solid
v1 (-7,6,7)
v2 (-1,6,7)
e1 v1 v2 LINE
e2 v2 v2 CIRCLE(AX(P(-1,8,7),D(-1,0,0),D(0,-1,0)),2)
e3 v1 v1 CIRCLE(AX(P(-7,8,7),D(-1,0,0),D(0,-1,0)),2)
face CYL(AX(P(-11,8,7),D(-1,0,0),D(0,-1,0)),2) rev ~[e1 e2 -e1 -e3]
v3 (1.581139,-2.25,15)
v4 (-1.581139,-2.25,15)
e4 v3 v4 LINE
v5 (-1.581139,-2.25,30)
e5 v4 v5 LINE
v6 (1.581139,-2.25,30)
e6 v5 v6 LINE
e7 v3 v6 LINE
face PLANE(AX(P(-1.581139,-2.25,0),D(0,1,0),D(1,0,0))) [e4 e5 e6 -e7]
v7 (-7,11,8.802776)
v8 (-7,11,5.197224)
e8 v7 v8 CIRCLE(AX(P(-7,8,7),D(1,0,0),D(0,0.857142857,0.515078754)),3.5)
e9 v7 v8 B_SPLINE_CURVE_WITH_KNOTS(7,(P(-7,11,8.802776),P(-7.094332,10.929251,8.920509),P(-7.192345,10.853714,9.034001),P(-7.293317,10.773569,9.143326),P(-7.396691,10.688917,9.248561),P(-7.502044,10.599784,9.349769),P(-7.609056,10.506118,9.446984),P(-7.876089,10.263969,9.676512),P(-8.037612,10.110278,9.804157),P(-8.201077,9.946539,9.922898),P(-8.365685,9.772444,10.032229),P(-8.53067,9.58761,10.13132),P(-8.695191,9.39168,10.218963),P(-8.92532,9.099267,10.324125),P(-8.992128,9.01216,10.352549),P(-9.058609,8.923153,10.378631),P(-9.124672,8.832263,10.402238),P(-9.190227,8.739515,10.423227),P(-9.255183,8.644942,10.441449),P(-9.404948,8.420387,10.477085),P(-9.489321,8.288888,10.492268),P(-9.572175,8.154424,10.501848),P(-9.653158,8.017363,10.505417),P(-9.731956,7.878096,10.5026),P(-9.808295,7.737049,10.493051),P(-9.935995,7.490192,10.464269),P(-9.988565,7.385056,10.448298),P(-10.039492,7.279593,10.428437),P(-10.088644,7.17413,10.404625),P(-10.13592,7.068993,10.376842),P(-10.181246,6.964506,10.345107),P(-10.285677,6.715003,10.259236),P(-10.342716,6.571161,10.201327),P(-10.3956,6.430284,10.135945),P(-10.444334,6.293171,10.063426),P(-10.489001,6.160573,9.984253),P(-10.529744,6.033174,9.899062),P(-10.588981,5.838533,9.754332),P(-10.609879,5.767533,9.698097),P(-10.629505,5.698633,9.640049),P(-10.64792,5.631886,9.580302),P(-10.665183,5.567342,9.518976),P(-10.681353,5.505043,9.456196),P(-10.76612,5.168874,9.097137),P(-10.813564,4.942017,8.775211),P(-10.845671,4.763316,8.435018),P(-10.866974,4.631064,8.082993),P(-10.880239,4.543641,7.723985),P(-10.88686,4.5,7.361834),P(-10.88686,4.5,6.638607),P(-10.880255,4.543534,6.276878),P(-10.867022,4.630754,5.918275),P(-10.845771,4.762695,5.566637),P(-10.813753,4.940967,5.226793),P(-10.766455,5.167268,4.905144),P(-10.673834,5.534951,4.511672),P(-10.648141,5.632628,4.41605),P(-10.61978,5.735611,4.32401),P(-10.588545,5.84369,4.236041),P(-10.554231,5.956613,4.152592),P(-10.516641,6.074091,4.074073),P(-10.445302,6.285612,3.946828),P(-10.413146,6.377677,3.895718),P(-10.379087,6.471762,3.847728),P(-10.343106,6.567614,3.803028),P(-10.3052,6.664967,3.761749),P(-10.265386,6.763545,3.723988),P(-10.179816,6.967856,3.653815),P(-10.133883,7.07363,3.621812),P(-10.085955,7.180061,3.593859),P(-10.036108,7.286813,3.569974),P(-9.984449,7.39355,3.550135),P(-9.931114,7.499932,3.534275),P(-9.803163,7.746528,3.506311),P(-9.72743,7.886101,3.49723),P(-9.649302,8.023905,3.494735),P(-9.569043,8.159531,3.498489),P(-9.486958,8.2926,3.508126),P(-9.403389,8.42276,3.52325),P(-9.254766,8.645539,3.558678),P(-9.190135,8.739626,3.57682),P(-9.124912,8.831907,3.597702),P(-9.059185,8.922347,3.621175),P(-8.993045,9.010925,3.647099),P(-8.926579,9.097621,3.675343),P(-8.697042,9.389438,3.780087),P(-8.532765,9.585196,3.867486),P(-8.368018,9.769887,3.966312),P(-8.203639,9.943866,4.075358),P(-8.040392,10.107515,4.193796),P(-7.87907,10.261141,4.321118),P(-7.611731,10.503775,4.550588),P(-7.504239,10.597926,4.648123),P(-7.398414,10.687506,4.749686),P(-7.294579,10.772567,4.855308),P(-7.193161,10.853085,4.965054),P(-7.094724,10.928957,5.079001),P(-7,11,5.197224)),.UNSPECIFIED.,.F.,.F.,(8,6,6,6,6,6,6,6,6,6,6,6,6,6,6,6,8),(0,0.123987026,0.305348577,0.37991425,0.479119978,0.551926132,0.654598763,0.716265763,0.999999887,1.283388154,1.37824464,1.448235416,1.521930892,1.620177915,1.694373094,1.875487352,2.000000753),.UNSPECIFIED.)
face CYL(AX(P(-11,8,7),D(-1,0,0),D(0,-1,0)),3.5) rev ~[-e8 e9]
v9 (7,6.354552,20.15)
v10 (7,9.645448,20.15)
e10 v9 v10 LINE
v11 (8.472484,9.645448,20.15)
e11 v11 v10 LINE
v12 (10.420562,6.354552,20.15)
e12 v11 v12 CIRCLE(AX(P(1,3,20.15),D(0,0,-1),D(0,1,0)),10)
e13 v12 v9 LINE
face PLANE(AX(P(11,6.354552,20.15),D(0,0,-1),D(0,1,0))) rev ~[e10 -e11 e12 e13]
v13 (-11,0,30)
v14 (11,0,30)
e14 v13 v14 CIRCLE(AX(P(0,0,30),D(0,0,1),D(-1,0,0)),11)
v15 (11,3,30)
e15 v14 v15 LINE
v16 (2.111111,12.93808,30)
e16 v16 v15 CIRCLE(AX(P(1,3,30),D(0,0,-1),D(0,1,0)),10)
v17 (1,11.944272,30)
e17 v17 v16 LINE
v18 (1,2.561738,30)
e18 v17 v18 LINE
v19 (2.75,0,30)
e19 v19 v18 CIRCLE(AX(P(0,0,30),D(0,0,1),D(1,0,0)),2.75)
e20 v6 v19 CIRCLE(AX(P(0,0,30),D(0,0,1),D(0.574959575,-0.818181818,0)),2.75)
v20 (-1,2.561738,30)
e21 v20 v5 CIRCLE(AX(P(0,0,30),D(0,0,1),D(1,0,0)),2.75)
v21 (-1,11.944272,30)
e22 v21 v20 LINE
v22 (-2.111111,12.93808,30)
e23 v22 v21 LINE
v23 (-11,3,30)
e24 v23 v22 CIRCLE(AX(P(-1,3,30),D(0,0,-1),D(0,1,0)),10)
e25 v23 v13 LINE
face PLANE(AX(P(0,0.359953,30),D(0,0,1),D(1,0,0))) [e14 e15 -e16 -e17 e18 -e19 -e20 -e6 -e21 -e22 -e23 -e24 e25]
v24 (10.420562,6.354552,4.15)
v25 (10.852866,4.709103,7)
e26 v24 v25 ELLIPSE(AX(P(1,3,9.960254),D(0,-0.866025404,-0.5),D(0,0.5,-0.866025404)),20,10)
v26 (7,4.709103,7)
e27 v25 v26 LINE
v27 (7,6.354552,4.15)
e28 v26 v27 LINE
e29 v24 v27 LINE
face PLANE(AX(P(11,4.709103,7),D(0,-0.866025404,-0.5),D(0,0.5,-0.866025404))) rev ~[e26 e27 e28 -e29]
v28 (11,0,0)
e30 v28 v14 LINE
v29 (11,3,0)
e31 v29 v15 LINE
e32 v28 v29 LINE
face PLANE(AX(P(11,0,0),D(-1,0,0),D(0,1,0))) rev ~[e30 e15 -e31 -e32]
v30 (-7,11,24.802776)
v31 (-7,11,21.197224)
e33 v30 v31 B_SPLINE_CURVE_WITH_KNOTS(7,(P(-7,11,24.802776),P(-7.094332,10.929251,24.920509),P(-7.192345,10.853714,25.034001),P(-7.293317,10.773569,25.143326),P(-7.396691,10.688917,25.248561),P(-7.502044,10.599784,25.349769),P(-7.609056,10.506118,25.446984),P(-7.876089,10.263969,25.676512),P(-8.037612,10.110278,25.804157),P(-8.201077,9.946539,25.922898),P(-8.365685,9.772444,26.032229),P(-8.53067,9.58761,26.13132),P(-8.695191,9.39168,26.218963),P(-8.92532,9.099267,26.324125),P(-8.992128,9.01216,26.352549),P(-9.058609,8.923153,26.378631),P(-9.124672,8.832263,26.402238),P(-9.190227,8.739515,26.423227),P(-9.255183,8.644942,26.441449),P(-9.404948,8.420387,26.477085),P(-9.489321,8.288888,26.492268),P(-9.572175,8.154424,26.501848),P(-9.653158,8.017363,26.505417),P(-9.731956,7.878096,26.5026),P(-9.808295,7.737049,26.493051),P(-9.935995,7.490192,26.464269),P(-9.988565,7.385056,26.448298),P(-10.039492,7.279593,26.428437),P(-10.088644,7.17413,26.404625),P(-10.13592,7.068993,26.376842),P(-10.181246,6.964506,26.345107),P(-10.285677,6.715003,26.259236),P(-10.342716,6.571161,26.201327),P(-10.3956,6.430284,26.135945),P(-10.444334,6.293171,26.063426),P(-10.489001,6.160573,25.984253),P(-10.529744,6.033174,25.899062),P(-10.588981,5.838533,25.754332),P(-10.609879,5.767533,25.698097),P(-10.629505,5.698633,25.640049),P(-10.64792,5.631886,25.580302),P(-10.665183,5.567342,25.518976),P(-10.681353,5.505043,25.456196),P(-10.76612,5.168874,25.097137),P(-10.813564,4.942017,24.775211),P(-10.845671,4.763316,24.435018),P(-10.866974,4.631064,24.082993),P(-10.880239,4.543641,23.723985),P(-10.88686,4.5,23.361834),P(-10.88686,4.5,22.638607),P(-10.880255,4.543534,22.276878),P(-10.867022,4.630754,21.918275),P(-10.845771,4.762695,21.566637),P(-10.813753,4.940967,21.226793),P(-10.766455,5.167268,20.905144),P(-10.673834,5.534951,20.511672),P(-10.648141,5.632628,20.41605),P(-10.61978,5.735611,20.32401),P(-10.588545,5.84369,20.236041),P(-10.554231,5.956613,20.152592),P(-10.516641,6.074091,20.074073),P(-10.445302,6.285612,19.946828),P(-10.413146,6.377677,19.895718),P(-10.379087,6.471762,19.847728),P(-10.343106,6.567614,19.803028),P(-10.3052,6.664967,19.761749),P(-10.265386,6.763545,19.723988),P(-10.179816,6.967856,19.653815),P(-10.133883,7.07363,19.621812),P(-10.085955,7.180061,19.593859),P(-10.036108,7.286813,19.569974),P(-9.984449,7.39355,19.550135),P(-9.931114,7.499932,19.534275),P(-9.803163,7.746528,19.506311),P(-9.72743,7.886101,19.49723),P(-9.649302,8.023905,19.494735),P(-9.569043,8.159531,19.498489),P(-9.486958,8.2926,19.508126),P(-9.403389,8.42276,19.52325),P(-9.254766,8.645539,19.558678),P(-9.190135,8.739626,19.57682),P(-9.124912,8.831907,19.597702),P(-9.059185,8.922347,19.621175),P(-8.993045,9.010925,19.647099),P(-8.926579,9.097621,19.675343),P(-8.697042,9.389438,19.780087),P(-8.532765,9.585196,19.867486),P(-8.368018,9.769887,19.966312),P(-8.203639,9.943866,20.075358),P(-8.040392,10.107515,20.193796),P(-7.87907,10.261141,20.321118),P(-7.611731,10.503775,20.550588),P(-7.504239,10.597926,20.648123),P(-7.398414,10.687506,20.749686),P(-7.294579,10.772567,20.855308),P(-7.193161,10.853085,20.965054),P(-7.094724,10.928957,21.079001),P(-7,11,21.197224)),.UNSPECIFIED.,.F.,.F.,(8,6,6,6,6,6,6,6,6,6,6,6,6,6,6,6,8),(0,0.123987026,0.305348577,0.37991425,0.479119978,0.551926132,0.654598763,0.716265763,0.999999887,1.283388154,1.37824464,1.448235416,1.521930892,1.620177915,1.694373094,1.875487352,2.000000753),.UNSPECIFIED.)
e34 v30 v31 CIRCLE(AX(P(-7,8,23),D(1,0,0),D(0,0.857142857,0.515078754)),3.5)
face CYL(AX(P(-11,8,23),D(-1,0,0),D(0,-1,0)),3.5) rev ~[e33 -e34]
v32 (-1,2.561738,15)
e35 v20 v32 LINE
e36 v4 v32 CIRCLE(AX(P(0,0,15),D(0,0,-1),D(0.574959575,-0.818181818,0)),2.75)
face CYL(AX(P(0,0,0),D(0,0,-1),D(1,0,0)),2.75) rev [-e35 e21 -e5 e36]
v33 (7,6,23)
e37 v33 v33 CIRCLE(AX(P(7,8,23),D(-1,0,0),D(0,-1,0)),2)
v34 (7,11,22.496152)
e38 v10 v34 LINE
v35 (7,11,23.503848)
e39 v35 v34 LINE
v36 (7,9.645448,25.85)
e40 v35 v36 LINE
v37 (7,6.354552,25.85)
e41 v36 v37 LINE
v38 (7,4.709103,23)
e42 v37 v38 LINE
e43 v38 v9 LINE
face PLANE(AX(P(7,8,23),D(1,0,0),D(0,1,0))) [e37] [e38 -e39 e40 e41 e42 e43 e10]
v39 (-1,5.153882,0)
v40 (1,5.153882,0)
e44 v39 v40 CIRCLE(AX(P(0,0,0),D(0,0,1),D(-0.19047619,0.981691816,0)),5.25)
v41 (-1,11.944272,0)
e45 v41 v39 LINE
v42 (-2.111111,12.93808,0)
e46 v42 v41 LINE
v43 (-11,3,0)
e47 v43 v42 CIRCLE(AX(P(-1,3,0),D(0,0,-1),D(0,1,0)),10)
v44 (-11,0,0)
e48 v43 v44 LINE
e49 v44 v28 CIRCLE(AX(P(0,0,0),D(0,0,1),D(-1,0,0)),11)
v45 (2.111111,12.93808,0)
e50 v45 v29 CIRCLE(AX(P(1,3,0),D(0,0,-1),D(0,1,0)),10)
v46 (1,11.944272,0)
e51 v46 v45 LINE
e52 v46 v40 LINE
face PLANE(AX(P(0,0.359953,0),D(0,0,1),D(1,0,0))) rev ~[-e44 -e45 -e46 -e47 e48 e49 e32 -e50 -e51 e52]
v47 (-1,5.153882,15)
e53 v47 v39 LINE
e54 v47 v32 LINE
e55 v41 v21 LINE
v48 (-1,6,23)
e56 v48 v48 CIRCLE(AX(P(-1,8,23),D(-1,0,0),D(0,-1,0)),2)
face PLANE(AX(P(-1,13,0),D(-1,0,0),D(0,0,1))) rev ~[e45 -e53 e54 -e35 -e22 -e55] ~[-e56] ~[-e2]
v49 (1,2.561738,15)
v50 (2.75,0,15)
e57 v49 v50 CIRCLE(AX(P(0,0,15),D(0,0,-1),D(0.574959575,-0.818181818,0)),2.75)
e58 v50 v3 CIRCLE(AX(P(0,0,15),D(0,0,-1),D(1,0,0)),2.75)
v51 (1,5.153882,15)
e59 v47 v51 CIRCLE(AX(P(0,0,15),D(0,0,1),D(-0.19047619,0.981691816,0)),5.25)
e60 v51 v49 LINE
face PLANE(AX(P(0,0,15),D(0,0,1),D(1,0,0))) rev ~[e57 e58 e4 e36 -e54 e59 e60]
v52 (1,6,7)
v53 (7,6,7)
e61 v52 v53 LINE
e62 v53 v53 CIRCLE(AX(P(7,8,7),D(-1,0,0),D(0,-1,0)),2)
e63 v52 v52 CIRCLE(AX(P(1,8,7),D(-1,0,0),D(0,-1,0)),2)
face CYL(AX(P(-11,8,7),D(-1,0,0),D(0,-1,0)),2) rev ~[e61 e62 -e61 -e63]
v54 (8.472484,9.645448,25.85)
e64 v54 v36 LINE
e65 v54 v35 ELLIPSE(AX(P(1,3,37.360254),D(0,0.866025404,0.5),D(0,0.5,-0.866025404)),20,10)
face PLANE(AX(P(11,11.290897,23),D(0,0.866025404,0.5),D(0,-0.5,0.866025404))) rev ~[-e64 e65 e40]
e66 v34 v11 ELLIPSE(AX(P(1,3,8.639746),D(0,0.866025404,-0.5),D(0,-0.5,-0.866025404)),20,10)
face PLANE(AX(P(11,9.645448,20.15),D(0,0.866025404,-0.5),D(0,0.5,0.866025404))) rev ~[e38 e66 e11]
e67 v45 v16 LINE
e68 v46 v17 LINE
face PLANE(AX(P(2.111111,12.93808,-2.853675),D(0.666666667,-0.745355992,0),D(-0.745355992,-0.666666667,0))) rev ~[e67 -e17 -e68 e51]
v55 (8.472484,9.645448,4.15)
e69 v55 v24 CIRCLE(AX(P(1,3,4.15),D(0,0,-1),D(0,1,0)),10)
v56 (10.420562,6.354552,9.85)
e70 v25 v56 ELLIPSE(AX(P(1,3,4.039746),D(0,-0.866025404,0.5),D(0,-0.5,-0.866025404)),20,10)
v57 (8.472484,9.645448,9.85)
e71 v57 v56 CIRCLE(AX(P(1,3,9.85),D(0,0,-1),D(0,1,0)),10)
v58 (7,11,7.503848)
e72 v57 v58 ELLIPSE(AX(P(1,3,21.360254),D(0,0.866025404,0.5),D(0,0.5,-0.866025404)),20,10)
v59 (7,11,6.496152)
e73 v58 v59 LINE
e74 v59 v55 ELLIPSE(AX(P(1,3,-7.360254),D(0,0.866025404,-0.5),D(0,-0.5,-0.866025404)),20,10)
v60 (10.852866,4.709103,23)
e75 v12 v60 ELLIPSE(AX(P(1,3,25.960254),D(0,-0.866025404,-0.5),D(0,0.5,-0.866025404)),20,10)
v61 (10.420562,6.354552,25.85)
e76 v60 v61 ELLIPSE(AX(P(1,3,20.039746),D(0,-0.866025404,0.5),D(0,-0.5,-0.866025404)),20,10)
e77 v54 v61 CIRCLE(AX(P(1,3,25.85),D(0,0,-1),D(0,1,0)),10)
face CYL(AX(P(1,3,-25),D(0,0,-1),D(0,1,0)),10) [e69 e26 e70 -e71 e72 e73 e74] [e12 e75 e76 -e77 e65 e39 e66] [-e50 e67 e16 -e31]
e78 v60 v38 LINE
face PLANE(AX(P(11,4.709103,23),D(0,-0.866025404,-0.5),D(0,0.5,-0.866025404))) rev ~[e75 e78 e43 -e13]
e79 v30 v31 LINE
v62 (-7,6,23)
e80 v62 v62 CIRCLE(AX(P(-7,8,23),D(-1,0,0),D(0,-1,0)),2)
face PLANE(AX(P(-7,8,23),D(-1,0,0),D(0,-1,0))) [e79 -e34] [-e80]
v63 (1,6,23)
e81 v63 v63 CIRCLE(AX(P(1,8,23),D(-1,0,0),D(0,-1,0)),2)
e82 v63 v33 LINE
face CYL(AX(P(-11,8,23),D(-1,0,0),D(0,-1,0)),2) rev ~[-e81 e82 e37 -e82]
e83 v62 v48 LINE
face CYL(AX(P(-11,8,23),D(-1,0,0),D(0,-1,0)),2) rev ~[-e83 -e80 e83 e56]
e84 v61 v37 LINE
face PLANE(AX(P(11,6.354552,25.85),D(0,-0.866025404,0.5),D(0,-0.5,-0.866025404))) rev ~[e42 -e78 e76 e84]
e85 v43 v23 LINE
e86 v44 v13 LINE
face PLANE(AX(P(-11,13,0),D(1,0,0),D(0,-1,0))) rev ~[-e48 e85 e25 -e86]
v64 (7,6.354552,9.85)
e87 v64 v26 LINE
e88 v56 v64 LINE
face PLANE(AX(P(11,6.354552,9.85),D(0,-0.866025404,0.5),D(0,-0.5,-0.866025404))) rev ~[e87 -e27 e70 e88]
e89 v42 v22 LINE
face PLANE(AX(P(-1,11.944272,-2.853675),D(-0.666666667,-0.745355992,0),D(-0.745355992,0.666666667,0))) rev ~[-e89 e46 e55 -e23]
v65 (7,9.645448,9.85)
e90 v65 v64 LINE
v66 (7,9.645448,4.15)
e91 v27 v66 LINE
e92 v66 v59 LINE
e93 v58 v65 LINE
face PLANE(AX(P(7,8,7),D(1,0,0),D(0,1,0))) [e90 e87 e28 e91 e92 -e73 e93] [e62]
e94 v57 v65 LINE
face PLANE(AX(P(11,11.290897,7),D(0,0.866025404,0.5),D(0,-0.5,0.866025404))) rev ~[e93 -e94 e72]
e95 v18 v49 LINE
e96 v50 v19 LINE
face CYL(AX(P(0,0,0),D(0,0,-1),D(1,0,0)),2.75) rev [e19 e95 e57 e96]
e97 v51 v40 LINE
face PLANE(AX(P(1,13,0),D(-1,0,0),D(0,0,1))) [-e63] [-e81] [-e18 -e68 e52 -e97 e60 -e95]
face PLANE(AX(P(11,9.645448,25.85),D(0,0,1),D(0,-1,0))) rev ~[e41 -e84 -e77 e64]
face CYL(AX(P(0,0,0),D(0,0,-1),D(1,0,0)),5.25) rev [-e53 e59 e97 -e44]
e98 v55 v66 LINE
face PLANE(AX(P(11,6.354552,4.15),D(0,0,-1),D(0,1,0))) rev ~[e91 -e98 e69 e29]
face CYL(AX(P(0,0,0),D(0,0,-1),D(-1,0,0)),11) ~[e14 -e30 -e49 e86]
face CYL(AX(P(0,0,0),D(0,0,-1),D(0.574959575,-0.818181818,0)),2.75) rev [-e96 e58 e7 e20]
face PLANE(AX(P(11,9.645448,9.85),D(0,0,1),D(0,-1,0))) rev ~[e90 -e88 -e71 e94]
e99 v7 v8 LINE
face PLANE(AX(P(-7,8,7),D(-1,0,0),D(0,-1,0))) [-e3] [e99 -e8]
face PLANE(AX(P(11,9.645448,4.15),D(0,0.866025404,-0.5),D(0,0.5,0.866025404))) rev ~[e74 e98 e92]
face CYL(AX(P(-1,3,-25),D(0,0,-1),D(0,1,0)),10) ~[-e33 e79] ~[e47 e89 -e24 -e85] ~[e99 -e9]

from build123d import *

# Parameters (mm, degrees)
F0_R         = 5.25
F1_DEPTH     = 30
F2_DEPTH     = 15
F3_DEPTH     = 30
F4_R         = 2
F6_DEPTH     = 22
F4_R_2       = 3.5
F7_DEPTH     = 4
F5_R         = 2
F8_DEPTH     = 4
F9_W         = 1
F9_H         = 30
F10_DEPTH    = 15
F11_T1_DEPTH = 80
F12_T1_DEPTH = 35.7073493424


# Not quite as in the source:
# - a fillet or chamfer that OpenCascade refuses, or shapes differently, is made with other operations: its cross-section is extruded or revolved along the edge and cut away or added


with BuildPart() as f1:
    # F0 (on Top) → F1 (new body)
    with BuildSketch(Plane.XY):
        with BuildLine():
            ThreePointArc((-11, 0), (0, -11), (11, 0))
            ThreePointArc((11, 0), (7.7781745931, 7.7781745931), (0, 11))
            ThreePointArc((0, 11), (-7.7781745931, 7.7781745931), (-11, 0))
        make_face()
        Circle(F0_R, mode=Mode.SUBTRACT)
        Circle(F0_R)
        with BuildLine():
            ThreePointArc((-1.5811388301, -2.25), (-1.2677476518, 2.4403515918), (2.75, 0))
            ThreePointArc((2.75, 0), (2.4403515918, -1.2677476518), (1.5811388301, -2.25))
            ThreePointArc((1.5811388301, -2.25), (0, -2.75), (-1.5811388301, -2.25))
        make_face(mode=Mode.SUBTRACT)
        with BuildLine():
            ThreePointArc((-11, 0), (-7.7781745931, 7.7781745931), (0, 11))
            Line((0, 11), (-11, 11))
            Line((-11, 11), (-11, 0))
        make_face()
        with BuildLine():
            ThreePointArc((0, 11), (7.7781745931, 7.7781745931), (11, 0))
            Line((11, 0), (11, 11))
            Line((11, 11), (0, 11))
        make_face()
        Polygon((-11, 11), (0, 11), (11, 11), (11, 13), (-11, 13), align=None)
        with BuildLine():
            Line((0, -2.25), (-1.5811388301, -2.25))
            ThreePointArc((-1.5811388301, -2.25), (0, -2.75), (1.5811388301, -2.25))
            Line((1.5811388301, -2.25), (0, -2.25))
        make_face()
        with BuildLine():
            ThreePointArc((1.5811388301, -2.25), (2.4403515918, -1.2677476518), (2.75, 0))
            ThreePointArc((2.75, 0), (-1.2677476518, 2.4403515918), (-1.5811388301, -2.25))
            Line((-1.5811388301, -2.25), (0, -2.25))
            Line((0, -2.25), (1.5811388301, -2.25))
        make_face()
    extrude(amount=F1_DEPTH)

    # F0 (on Top) → F2 (cut)
    with BuildSketch(Plane.XY):
        Circle(F0_R)
        with BuildLine():
            ThreePointArc((-1.5811388301, -2.25), (-1.2677476518, 2.4403515918), (2.75, 0))
            ThreePointArc((2.75, 0), (2.4403515918, -1.2677476518), (1.5811388301, -2.25))
            ThreePointArc((1.5811388301, -2.25), (0, -2.75), (-1.5811388301, -2.25))
        make_face(mode=Mode.SUBTRACT)
        with BuildLine():
            Line((0, -2.25), (-1.5811388301, -2.25))
            ThreePointArc((-1.5811388301, -2.25), (0, -2.75), (1.5811388301, -2.25))
            Line((1.5811388301, -2.25), (0, -2.25))
        make_face()
    extrude(amount=F2_DEPTH, mode=Mode.SUBTRACT)

    # F0 (on Top) → F3 (cut)
    with BuildSketch(Plane.XY):
        with BuildLine():
            ThreePointArc((1.5811388301, -2.25), (2.4403515918, -1.2677476518), (2.75, 0))
            ThreePointArc((2.75, 0), (-1.2677476518, 2.4403515918), (-1.5811388301, -2.25))
            Line((-1.5811388301, -2.25), (0, -2.25))
            Line((0, -2.25), (1.5811388301, -2.25))
        make_face()
    extrude(amount=F3_DEPTH, mode=Mode.SUBTRACT)

    # F4 (on face) → F6 (cut)
    with BuildSketch(Plane(origin=(-11, 0, 0), x_dir=(0, -1, 0), z_dir=(-1, 0, 0))):
        with Locations((-8, 7)):
            Circle(F4_R)
        with Locations((-8, 23)):
            Circle(F4_R)
    extrude(amount=-F6_DEPTH, mode=Mode.SUBTRACT)

    # F4 (on face) → F7 (cut)
    with BuildSketch(Plane(origin=(-11, 0, 0), x_dir=(0, -1, 0), z_dir=(-1, 0, 0))):
        with Locations((-8, 7)):
            Circle(F4_R_2)
        with Locations((-8, 7)):
            Circle(F4_R, mode=Mode.SUBTRACT)
        with Locations((-8, 23)):
            Circle(F4_R_2)
        with Locations((-8, 23)):
            Circle(F4_R, mode=Mode.SUBTRACT)
    extrude(amount=-F7_DEPTH, mode=Mode.SUBTRACT)

    # F5 (on face) → F8 (cut)
    with BuildSketch(Plane.YZ.offset(11)):
        Polygon((6.3545517328, 4.15), (9.6454482672, 4.15), (11.2908965344, 7), (9.6454482672, 9.85), (6.3545517328, 9.85), (4.7091034656, 7), align=None)
        with Locations((8, 7)):
            Circle(F5_R, mode=Mode.SUBTRACT)
        Polygon((6.3545517328, 20.15), (9.6454482672, 20.15), (11.2908965344, 23), (9.6454482672, 25.85), (6.3545517328, 25.85), (4.7091034656, 23), align=None)
        with Locations((8, 23)):
            Circle(F5_R, mode=Mode.SUBTRACT)
    extrude(amount=-F8_DEPTH, mode=Mode.SUBTRACT)

    # F9 (on face) → F10 (cut)
    with BuildSketch(Plane(origin=(0, 13, 0), x_dir=(-1, 0, 0), z_dir=(0, 1, 0))):
        with Locations((0.5, 15)):
            Rectangle(F9_W, F9_H)
        with Locations((-0.5, 15)):
            Rectangle(F9_W, F9_H)
    extrude(amount=-F10_DEPTH, mode=Mode.SUBTRACT)

    # F11: fillet of radius 10 on 2 edges, made by hand

    # F11_s2 → F11_t1 (cut)
    with BuildSketch(Plane.XY.offset(-25)):
        with BuildLine():
            ThreePointArc((-1, 13), (-8.0710678119, 10.0710678119), (-11, 3))
            Line((-11, 3), (-11, 13))
            Line((-11, 13), (-1, 13))
        make_face()
        with BuildLine():
            ThreePointArc((1, 13), (8.0710678119, 10.0710678119), (11, 3))
            Line((11, 3), (11, 13))
            Line((11, 13), (1, 13))
        make_face()
    extrude(amount=F11_T1_DEPTH, mode=Mode.SUBTRACT)

    # F12: chamfer of 1 on 2 edges, made by hand

    # F12_s2 → F12_t1 (cut)
    with BuildSketch(Plane.XY.offset(-2.8536746712)):
        with BuildLine():
            Line((-1, 11.94427191), (-2.1111111111, 12.9380799))
            ThreePointArc((-2.1111111111, 12.9380799), (-1.5705391213, 12.983710989), (-1, 13))
            Line((-1, 13), (-1, 11.94427191))
        make_face()
        with BuildLine():
            Line((2.1111111111, 12.9380799), (1, 11.94427191))
            Line((1, 11.94427191), (1, 13))
            ThreePointArc((1, 13), (1.5705391213, 12.983710989), (2.1111111111, 12.9380799))
        make_face()
    extrude(amount=F12_T1_DEPTH, mode=Mode.SUBTRACT)


solid = f1.part
